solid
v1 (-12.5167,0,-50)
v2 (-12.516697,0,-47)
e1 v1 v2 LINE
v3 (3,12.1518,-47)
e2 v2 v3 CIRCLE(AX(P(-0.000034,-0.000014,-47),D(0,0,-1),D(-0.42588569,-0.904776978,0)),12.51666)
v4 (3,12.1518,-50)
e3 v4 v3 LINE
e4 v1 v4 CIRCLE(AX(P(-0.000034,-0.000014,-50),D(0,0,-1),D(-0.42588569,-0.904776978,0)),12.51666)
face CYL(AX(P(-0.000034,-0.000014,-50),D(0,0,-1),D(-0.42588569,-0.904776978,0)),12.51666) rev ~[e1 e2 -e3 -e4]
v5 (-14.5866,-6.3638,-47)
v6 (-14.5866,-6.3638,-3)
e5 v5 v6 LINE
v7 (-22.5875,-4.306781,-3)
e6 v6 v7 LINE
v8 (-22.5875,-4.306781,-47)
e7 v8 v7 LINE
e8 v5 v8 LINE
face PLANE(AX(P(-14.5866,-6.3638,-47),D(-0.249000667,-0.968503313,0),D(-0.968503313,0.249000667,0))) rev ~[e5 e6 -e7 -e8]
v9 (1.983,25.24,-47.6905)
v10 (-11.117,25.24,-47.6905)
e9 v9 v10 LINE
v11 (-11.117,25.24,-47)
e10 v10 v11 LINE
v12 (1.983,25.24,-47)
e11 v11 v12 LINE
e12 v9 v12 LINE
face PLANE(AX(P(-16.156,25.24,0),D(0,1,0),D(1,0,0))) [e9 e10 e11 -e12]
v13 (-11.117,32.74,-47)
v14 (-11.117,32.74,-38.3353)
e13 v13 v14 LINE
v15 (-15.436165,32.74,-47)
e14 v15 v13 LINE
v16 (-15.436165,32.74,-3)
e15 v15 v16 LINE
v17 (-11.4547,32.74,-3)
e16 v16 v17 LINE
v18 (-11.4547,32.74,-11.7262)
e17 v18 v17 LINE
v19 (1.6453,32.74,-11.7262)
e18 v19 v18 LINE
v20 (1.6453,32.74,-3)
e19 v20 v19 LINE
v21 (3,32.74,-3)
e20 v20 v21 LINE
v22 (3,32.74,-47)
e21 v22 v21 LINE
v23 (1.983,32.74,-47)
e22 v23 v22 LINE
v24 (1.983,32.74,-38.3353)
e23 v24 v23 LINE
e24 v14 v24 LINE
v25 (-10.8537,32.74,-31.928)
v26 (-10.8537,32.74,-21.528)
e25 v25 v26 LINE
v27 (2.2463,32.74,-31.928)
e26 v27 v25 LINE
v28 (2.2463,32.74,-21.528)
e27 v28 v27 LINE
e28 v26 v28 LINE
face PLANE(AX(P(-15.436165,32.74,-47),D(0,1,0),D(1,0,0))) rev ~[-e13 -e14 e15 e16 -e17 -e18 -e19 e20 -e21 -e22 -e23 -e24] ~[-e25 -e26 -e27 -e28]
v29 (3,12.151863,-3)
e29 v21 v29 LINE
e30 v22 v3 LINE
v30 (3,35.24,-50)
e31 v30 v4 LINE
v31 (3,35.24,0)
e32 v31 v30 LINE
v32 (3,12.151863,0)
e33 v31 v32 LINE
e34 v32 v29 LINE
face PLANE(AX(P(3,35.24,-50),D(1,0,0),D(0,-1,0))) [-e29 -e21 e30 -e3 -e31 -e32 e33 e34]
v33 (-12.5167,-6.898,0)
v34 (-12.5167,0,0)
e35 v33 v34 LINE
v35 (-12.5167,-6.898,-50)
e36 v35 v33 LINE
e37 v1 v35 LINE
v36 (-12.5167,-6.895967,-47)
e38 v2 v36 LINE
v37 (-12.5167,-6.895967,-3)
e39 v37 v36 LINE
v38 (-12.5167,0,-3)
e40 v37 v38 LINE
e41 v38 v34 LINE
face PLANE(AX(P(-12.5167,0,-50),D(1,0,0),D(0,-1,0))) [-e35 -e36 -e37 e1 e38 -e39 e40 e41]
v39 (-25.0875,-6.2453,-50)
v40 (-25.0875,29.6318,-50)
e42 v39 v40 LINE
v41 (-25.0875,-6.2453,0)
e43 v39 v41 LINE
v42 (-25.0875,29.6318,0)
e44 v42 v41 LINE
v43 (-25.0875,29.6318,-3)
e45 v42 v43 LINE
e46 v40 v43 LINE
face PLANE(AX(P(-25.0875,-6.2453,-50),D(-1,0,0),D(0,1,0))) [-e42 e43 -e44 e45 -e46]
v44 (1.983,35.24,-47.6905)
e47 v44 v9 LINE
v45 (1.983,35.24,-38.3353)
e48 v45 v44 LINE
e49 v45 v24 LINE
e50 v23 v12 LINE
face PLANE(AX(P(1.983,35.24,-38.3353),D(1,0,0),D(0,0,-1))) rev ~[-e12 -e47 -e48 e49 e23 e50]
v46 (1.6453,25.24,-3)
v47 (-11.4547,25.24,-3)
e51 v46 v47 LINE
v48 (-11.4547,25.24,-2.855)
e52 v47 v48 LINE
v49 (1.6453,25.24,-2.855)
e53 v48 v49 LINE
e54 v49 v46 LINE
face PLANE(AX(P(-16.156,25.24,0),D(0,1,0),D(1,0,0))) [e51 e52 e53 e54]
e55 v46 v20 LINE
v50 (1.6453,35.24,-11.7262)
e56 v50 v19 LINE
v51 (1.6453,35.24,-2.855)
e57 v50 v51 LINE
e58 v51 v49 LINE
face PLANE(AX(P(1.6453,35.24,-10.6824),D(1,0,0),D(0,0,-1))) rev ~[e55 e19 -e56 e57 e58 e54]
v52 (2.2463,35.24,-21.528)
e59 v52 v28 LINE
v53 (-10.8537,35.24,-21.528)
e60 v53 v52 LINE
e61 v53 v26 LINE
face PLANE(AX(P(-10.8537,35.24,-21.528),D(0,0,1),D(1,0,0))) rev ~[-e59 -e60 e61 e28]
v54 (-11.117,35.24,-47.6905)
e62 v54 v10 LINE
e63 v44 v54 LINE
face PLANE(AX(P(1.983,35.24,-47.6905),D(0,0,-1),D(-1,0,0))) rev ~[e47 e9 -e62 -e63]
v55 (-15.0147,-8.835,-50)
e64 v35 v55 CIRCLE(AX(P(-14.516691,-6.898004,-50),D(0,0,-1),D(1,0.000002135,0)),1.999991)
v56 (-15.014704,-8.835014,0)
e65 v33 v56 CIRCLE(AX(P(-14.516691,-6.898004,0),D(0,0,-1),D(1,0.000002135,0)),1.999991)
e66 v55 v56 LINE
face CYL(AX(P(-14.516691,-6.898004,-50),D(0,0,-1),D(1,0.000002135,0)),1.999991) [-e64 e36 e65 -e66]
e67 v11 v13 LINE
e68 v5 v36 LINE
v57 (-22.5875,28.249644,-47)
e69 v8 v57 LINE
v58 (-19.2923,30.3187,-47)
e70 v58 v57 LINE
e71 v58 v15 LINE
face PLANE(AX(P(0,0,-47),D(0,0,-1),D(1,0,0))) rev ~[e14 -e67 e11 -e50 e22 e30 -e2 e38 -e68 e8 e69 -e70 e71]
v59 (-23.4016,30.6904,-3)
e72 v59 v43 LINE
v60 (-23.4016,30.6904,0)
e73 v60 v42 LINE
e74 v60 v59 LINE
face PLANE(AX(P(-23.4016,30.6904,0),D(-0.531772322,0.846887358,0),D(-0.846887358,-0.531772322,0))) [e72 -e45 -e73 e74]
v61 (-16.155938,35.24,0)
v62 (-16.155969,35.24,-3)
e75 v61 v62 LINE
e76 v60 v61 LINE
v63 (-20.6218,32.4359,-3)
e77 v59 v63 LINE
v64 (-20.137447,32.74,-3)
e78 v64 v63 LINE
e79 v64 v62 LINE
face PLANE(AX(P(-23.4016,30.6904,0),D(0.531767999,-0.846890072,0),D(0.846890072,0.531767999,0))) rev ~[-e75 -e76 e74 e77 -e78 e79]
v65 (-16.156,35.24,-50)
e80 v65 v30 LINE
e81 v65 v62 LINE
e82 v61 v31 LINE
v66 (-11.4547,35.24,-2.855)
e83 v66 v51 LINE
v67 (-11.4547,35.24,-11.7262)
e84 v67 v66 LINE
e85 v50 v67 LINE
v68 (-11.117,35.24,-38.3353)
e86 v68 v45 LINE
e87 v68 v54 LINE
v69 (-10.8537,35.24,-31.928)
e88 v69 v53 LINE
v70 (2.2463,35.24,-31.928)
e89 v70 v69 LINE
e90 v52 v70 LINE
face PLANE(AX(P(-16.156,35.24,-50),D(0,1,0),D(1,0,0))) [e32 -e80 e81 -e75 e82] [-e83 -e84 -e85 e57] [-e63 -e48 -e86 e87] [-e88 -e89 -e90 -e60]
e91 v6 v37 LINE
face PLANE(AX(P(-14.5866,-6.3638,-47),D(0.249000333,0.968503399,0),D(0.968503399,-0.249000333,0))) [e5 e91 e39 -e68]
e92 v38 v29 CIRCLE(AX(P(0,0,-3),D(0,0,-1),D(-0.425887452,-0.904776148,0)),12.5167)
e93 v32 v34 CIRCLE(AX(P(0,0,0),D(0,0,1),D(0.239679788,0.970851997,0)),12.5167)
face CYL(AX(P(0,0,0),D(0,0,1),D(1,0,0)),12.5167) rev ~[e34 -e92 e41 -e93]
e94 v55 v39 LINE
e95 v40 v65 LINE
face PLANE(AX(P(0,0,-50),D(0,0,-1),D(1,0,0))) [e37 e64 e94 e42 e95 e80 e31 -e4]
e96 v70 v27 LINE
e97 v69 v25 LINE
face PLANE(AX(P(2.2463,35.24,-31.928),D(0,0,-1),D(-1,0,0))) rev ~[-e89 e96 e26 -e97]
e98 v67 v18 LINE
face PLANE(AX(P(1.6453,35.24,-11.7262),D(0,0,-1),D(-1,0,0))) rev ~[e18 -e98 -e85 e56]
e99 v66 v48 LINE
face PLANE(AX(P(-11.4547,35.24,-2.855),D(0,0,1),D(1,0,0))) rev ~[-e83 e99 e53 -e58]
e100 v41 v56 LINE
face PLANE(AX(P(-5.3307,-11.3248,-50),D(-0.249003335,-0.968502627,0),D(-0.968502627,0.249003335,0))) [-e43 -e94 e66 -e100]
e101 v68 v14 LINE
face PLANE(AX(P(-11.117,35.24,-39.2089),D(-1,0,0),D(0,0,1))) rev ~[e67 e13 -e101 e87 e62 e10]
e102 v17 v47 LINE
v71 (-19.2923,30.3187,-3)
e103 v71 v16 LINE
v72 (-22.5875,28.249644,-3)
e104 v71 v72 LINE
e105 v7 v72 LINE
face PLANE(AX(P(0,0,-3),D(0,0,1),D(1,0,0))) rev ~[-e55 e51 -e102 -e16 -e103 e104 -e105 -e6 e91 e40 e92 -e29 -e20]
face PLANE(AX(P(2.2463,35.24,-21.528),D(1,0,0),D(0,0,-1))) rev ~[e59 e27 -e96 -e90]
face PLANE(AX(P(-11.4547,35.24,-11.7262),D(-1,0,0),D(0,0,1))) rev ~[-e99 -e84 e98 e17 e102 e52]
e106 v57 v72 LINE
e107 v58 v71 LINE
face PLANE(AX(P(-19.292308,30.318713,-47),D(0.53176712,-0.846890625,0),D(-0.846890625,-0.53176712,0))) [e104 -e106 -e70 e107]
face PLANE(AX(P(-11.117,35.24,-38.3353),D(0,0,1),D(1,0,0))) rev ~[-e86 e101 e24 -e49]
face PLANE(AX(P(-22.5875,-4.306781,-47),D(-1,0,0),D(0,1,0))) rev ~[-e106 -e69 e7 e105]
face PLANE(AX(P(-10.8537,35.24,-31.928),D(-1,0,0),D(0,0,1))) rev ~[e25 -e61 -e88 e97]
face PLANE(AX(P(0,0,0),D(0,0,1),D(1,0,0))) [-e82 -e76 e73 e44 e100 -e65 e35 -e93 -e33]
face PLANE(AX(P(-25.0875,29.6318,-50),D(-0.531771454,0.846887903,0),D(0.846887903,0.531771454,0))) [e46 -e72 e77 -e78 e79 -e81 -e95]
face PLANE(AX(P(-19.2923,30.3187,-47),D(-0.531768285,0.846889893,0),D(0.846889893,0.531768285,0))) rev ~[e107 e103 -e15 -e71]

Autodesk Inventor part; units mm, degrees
ref_plane "YZ Plane" through (0, 0, 0) normal (1, 0, 0) x (0, 1, 0)
ref_plane "XZ Plane" through (0, 0, 0) normal (0, 1, 0) x (-1, 0, 0)
ref_plane "XY Plane" through (0, 0, 0) normal (0, 0, 1) x (1, 0, 0)
sketch "Sketch1" plane through (0, 0, 0) normal (0, 0, 1) x (1, 0, 0)
  circle A0 centre (0, 0) radius 11 projected
  line L0 (9.8023, 37.5977) -> (3, 35.24) projected
  line L1 (3, 35.24) -> (3, 11.34) projected
  line L2 (3, 11.34) -> (9, 11.34) projected
  line L3 (9, 11.34) -> (9, 30.1331) projected
  line L4 (9, 30.1331) -> (7.9327, 24.5668) projected
  line L5 (7.9327, 24.5668) -> (7.3445, 24.6796) projected
  line L6 (7.3445, 24.6796) -> (9.8023, 37.5977) projected
  circle A1 centre (0, 0) radius 12.5167
  line L7 (-21, 24.5198) -> (-21, -3.96) projected
  line L8 (-19, -3.96) -> (-21, -3.96) projected
  line L9 (-19, 24.5198) -> (-19, -3.96) projected
  line L10 (-21, 24.5198) -> (-19, 24.5198) projected
  line L11 (-21, 28.5732) -> (-21, 24.5198) projected
  line L12 (-21, 24.5198) -> (-19, 24.5198) projected
  line L13 (-19, 28.5732) -> (-19, 24.5198) projected
  line L14 (-21, 28.5732) -> (-19, 28.5732) projected
  line L15 (1.6453, 33.2633) -> (-11.4547, 33.2633) projected
  line L16 (-19, 0.49) -> (-19, -3.96) projected
  line L17 (-14, 0.49) -> (-19, 0.49) projected
  line L18 (-14, -0.96) -> (-14, 0.49) projected
  arc A2 (-14, -0.96) -> (-11, -3.96) centre (-11, -0.96) ccw projected
  line L19 (-11, -3.96) -> (-19, -3.96) projected
  line L20 (3, 35.24) -> (-21, 35.24)
  line L21 (-11.4547, 35.24) -> (-22.0722, 28.5732)
  line L22 (-22.0722, 28.5732) -> (-23.4016, 30.6904)
  line L23 (-23.4016, 30.6904) -> (-12.7841, 37.3572)
  line L24 (-23.4016, 30.6904) -> (-25.0875, 29.6318)
  line L25 (-25.0875, 29.6318) -> (-25.0875, -6.2453)
  line L26 (-25.0875, -6.2453) -> (-5.3307, -11.3248)
  point P0 (0, 0)
  point P1 (3, 12.1518)
  point P2 (-16.156, 35.24)
  dimension "d0" = 2.5
extrude "Extrusion1" add sketch "Sketch1" against normal blind 3 contours L1 A1 A2 L18 L17 L9 L13 L14 L11 L7 L8 L19 L26 L25 L24 L22 L21 L20 | L21 L22 L23 L20 | A1 L19 L9 L17 L18 A2 | L8 L7 L10 L9 | L11 L14 L13 L10
ref_plane "Work Plane1" through (0, 0, -50) normal (0, 0, -1) x (1, 0, 0)
sketch "Sketch2" plane through (0, 0, -50) normal (0, 0, -1) x (1, 0, 0)
  line L0 (3, -35.24) -> (3, -12.1518) projected
  arc A0 (-5.3307, 11.3248) -> (3, -12.1518) centre (0, 0) ccw projected
  line L1 (-5.3307, 11.3248) -> (-25.0875, 6.2453) projected
  line L2 (-25.0875, 6.2453) -> (-25.0875, -29.6318) projected
  line L3 (-25.0875, -29.6318) -> (-16.156, -35.24) projected
  line L4 (-16.156, -35.24) -> (3, -35.24) projected
  point P0 (0, 0)
extrude "Extrusion2" add sketch "Sketch2" against normal blind 3
sketch "Sketch3" plane through (0, 0, -47) normal (0, 0, 1) x (1, 0, 0)
  line L0 (-25.0875, 29.6318) -> (-25.0875, -6.2453) projected
  line L1 (-25.0875, -6.2453) -> (-5.3307, -11.3248) projected
  arc A0 (3, 12.1518) -> (-5.3307, -11.3248) centre (0, 0) ccw projected
  line L2 (3, 12.1518) -> (3, 35.24) projected
  line L3 (3, 35.24) -> (-16.156, 35.24) projected
  line L4 (-16.156, 35.24) -> (-25.0875, 29.6318) projected
  line L5 (-25.0875, 29.6318) -> (-25.0875, -6.2453) projected
  line L6 (-25.0875, -6.2453) -> (-22.5875, -6.2453)
  line L7 (-22.5875, -6.2453) -> (-22.5875, 29.6318)
  line L8 (-22.5875, 29.6318) -> (-25.0875, 29.6318)
  line L9 (-25.0875, 29.6318) -> (-25.0875, -6.2453)
  line L10 (-16.156, 35.24) -> (-25.0875, 29.6318) projected
  line L11 (-20.6218, 32.4359) -> (-19.2923, 30.3187)
  line L12 (-19.2923, 30.3187) -> (-10.0223, 36.1394)
  line L13 (-10.0223, 36.1394) -> (-28.1615, 24.7497)
  line L14 (3, 12.1518) -> (3, 35.24) projected
  line L15 (3, 35.24) -> (-20.6218, 35.24)
  line L16 (-20.6218, 35.24) -> (-20.6218, 32.74)
  line L17 (-20.6218, 32.74) -> (3, 32.74)
  line L18 (3, 32.74) -> (3, 35.24)
  line L19 (-25.0875, -6.2453) -> (-5.3307, -11.3248) projected
  line L20 (-15.2091, -8.7851) -> (-14.5866, -6.3638)
  line L21 (-14.5866, -6.3638) -> (-34.8376, -1.1573)
  line L22 (-14.5866, -6.3638) -> (7.6026, -12.0686)
  point P0 (0, 0)
  point P1 (-9.9857, -7.5467)
  point P2 (-22.5875, -4.3067)
  point P3 (-22.5875, 28.2496)
  point P4 (-15.4362, 32.74)
  point P5 (3, 32.74)
  dimension "d5" = 2.5
  dimension "d6" = 2.5
  dimension "d7" = 2.5
  dimension "d8" = 2.5
extrude "Extrusion3" add sketch "Sketch3" along normal up to surface (44 mm away) contours L8 L7 L13 L0 | L4 L11 L13 L7 L8 | L13 L7 L21 L0 | L4 L17 L12 L11 | L21 L7 L6 L0 | L4 L3 L12 L17 | L6 L7 L21 L20 L1 | L12 L3 L2 L17 | L20 L22 A0 L1
sketch "Sketch4" plane through (-16.156, 35.24, 0) normal (0, 1, 0) x (1, 0, 0)
  line L0 (19.156, 0) -> (0, 0) projected
  line L1 (19.156, 0) -> (19.156, 50) projected
  line L2 (0, 50) -> (19.156, 50) projected
  line L3 (0, 0) -> (0, 50) projected
  line L4 (18.4023, 21.528) -> (18.4023, 31.928) projected
  line L5 (5.3023, 21.528) -> (18.4023, 21.528) projected
  line L6 (5.3023, 31.928) -> (5.3023, 21.528) projected
  line L7 (18.4023, 31.928) -> (5.3023, 31.928) projected
  line L8 (5.039, 38.3353) -> (18.139, 38.3353) projected
  line L9 (18.139, 38.3353) -> (18.139, 47.6905) projected
  line L10 (5.039, 38.3353) -> (18.139, 38.3353) projected
  line L11 (18.139, 38.3353) -> (18.139, 47.6905) projected
  line L12 (5.039, 38.3353) -> (18.139, 38.3353) projected
  line L13 (5.039, 47.6905) -> (5.039, 38.3353) projected
  line L14 (18.139, 47.6905) -> (5.039, 47.6905) projected
  line L15 (17.8013, 2.855) -> (17.8013, 11.7262) projected
  line L16 (4.7013, 2.855) -> (17.8013, 2.855) projected
  line L17 (4.7013, 11.7262) -> (4.7013, 2.855) projected
  line L18 (17.8013, 11.7262) -> (4.7013, 11.7262) projected
  line L19 (18.4023, 21.528) -> (18.4023, 31.928) projected
  line L20 (5.3023, 21.528) -> (18.4023, 21.528) projected
  line L21 (5.3023, 31.928) -> (5.3023, 21.528) projected
  line L22 (18.4023, 31.928) -> (5.3023, 31.928) projected
  line L23 (5.039, 39.2089) -> (18.139, 39.2089) projected
  line L24 (18.139, 39.2089) -> (18.139, 48.5642) projected
  line L25 (17.8013, 1.8112) -> (17.8013, 10.6824) projected
  line L26 (17.8013, 11.7262) -> (17.8013, 10.6824) projected
  line L27 (17.8013, 11.7262) -> (4.7013, 11.7262) projected
  line L28 (17.8013, 1.8112) -> (17.8013, 10.6824) projected
  line L29 (17.8013, 2.855) -> (17.8013, 1.8112) projected
  point P0 (16.156, 0)
extrude "Extrusion4" cut sketch "Sketch4" against normal blind 10 contours L5 L6 L7 L4 | L13 L23 L9 L8 | L13 L14 L9 L23 | L16 L17 L18 L15
sketch "Sketch5" plane through (0, 0, -50) normal (0, 0, -1) x (-1, 0, 0)
  line L0 (25.0875, -6.2453) -> (25.0875, 29.6318) projected
  line L1 (25.0875, 29.6318) -> (16.156, 35.24) projected
  line L2 (16.156, 35.24) -> (-3, 35.24) projected
  line L3 (-3, 35.24) -> (-3, 12.1518) projected
  arc A0 (5.3307, -11.3248) -> (-3, 12.1518) centre (0, 0) ccw projected
  line L4 (5.3307, -11.3248) -> (25.0875, -6.2453) projected
  arc A1 (9.9857, -7.5467) -> (-3, 12.1518) centre (0, 0) ccw projected
  line L5 (12.5167, 0) -> (12.5167, -6.898)
  line L6 (25.0875, -6.2453) -> (15.0147, -8.835)
  line L7 (5.3307, -11.3248) -> (25.0875, -6.2453) projected
  arc A2 (12.5167, -6.898) -> (15.0147, -8.835) centre (14.5167, -6.898) ccw
  point P0 (0, 0)
  point P1 (12.5167, -9.4773)
  point P2 (15.0147, -8.835)
  point P3 (12.5167, 0)
  dimension "d13" = 2
extrude "Extrusion5" cut sketch "Sketch5" against normal through all contours L4 A0 L5 A2
properties part number "obudowa"
